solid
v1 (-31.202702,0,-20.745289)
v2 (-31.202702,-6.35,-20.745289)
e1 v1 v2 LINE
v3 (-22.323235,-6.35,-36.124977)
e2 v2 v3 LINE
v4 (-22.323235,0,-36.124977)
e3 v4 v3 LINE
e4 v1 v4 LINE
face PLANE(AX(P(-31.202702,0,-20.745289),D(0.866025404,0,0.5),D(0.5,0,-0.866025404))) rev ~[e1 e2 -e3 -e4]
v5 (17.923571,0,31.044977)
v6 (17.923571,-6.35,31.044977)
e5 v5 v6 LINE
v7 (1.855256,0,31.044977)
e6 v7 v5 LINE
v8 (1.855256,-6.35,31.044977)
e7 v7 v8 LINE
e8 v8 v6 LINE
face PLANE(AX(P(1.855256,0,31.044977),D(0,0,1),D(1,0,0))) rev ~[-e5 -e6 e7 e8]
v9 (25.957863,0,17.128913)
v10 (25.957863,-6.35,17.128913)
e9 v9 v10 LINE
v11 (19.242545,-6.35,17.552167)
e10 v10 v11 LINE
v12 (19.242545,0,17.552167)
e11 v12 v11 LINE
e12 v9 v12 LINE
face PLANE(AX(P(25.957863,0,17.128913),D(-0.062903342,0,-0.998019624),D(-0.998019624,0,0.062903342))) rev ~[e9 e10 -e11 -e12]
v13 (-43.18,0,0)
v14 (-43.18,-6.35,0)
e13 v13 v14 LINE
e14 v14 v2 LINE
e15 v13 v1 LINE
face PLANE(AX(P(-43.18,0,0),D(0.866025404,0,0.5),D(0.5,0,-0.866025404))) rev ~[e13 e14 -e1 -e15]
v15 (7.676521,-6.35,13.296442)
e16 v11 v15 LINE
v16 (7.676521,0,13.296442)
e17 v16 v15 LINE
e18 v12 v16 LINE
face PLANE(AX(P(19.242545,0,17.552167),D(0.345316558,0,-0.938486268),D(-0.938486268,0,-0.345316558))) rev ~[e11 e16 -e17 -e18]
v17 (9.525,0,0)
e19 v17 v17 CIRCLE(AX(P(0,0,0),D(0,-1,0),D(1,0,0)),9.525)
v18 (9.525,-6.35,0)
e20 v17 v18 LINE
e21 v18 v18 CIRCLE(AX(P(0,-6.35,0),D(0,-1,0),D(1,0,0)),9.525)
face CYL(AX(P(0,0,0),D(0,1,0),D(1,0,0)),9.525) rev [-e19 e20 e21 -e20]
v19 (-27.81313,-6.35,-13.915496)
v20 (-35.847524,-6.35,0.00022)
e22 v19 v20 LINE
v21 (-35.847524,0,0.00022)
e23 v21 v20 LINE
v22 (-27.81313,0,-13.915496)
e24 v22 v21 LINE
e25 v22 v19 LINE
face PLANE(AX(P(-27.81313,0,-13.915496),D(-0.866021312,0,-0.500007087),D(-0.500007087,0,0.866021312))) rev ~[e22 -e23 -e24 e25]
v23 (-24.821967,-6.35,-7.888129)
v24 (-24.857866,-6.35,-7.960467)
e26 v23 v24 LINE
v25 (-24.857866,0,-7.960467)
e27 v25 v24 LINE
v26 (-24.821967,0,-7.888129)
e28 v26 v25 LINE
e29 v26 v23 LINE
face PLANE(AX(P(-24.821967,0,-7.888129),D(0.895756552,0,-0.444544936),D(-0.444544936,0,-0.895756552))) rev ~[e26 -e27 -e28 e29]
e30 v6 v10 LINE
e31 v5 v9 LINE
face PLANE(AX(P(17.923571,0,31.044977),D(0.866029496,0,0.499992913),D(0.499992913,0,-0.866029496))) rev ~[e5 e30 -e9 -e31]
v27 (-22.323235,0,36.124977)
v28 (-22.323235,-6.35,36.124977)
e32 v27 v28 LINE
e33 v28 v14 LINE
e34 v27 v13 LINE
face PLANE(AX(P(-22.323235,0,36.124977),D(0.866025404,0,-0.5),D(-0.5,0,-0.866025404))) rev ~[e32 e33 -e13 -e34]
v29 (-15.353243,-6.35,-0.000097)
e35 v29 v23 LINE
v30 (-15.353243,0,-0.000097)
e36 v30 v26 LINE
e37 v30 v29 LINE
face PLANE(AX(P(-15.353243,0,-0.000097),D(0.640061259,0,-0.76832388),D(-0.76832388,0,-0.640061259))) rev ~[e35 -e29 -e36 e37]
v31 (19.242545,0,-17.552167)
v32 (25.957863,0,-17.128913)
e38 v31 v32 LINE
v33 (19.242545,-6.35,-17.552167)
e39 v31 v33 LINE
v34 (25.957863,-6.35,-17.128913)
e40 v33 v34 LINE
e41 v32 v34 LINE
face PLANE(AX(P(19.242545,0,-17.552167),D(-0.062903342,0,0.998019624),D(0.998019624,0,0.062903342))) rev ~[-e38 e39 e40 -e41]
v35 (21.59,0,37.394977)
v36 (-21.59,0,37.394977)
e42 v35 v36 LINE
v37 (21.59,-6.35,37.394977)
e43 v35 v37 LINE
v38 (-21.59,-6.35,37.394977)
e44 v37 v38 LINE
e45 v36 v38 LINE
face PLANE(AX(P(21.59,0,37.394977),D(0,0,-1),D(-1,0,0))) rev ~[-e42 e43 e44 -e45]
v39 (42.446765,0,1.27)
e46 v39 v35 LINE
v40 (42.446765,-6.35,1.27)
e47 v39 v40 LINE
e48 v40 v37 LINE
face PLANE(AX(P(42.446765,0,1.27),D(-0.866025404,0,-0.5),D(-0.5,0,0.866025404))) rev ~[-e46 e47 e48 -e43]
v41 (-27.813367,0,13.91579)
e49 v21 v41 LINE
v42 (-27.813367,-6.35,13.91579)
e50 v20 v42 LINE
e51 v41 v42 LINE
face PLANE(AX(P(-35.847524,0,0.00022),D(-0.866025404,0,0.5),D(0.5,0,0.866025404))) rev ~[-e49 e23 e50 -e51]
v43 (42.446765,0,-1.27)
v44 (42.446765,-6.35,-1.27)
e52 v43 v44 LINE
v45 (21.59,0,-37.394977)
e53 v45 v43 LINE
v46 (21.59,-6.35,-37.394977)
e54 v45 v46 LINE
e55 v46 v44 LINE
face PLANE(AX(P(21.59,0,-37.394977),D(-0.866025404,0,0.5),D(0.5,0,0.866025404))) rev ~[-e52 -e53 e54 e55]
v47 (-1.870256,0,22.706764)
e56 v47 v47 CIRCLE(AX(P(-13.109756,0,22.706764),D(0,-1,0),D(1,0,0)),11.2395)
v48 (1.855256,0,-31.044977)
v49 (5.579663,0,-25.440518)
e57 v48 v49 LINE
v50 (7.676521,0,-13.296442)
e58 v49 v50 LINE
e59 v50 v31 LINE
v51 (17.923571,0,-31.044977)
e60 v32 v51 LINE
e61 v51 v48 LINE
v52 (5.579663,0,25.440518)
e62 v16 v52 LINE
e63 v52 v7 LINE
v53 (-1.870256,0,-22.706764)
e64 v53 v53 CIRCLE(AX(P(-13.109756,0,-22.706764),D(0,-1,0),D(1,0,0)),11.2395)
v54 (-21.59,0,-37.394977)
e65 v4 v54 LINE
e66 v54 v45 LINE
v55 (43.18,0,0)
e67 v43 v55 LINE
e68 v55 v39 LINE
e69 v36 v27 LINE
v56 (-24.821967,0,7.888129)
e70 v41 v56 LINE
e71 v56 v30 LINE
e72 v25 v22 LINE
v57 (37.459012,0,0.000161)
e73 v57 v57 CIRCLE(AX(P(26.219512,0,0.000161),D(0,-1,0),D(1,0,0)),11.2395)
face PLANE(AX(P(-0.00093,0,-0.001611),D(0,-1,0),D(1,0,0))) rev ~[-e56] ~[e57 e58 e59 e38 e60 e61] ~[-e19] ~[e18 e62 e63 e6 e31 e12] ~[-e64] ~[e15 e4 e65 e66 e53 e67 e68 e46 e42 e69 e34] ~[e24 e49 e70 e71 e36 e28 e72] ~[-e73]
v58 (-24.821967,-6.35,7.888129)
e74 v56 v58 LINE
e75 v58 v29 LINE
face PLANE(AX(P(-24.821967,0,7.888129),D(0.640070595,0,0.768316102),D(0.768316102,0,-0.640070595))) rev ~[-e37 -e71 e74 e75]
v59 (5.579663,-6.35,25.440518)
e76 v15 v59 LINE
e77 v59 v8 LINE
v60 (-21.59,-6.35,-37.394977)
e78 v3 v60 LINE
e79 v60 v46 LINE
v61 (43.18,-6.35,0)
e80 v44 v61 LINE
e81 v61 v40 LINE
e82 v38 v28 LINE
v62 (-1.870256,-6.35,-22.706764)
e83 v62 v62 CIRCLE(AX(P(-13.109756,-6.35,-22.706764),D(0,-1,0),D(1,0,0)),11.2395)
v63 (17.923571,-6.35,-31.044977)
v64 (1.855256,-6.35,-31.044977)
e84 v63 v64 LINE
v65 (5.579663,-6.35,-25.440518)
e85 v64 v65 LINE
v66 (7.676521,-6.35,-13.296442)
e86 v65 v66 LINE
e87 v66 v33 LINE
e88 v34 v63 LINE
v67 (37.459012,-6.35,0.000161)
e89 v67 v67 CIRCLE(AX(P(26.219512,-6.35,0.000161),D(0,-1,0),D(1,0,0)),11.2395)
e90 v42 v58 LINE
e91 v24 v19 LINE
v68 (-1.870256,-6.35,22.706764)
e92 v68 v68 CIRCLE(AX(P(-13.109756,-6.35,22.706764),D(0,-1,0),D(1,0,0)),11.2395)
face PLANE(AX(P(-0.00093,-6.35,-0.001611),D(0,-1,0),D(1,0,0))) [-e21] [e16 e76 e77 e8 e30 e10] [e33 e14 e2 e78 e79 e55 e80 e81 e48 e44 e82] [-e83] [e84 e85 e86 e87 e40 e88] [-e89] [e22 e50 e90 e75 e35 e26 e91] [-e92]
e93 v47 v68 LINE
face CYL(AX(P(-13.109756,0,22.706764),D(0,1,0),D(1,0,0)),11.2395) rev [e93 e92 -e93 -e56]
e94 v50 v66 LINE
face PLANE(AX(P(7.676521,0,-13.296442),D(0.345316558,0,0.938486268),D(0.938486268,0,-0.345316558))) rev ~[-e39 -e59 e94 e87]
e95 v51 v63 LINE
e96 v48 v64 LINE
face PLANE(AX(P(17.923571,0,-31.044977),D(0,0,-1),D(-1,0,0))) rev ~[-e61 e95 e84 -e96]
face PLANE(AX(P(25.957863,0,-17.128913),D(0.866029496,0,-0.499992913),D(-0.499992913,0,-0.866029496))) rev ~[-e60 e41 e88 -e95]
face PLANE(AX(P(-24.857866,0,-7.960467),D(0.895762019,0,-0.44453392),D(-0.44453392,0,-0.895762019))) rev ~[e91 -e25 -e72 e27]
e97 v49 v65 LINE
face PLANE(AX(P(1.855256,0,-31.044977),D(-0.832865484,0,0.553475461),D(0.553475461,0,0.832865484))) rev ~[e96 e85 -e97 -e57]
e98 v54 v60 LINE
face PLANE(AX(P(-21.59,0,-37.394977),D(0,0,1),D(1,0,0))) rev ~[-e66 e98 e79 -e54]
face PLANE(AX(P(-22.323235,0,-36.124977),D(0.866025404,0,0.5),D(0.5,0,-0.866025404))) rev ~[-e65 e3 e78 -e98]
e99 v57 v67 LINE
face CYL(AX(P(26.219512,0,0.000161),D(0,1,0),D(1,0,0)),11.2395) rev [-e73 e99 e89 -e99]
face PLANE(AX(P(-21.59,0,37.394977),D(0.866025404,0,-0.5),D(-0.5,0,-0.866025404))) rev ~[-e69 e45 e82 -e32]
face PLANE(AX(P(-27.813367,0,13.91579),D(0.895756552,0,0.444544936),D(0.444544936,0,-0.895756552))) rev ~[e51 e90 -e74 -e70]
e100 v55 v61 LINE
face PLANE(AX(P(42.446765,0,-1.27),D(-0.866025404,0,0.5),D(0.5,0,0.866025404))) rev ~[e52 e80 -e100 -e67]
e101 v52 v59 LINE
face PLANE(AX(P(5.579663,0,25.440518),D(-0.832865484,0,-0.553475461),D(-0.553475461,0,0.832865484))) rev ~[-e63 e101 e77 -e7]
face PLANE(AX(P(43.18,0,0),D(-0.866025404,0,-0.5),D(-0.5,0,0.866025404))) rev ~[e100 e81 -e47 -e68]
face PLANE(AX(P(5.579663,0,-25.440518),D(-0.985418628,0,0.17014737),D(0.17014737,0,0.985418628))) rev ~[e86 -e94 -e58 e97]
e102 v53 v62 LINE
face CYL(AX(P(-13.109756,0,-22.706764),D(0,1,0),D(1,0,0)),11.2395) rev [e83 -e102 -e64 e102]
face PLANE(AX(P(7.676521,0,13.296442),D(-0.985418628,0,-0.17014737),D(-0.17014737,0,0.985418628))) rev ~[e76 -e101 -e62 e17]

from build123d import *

# Parameters (mm, degrees)
F0_R     = 11.2395
F0_R_2   = 9.525
F1_DEPTH = 6.35


# Not quite as in the source:
# - ends of sketch curves that miss each other by under 0.0002 mm in the source are joined


with BuildPart() as f1:
    # F0 (on Front) → F1 (new body)
    with BuildSketch(Plane.XZ):
        with BuildLine():
            Line((42.4467651581, 1.27), (33.5675281941, 16.6492895541))
            Line((33.5675281941, 16.6492895541), (21.59, 37.3949769354))
            Line((21.59, 37.3949769354), (-2.3645964913, 37.3949769354))
            Line((-2.3645964913, 37.3949769354), (-20.1235303163, 37.3949769354))
            ThreePointArc((-20.1235303163, 37.3949769354), (-21.3935303163, 37.054681461), (-22.3232348419, 36.1249769354))
            Line((-22.3232348419, 36.1249769354), (-31.2024718059, 20.7456873813))
            Line((-31.2024718059, 20.7456873813), (-43.18, 0))
            Line((-43.18, 0), (-31.2027017544, -20.7452890988))
            Line((-31.2027017544, -20.7452890988), (-22.3232348418, -36.1249769356))
            ThreePointArc((-22.3232348418, -36.1249769356), (-21.9195815404, -36.6510281597), (-21.3935303163, -37.0546814611))
            ThreePointArc((-21.3935303163, -37.0546814611), (-20.7809306909, -37.3084285342), (-20.1235303165, -37.3949769354))
            Line((-20.1235303165, -37.3949769354), (-2.3645964913, -37.3949769354))
            Line((-2.3645964913, -37.3949769354), (21.59, -37.3949769354))
            Line((21.59, -37.3949769354), (33.5675281941, -16.6492895541))
            Line((33.5675281941, -16.6492895541), (42.4467651581, -1.27))
            ThreePointArc((42.4467651581, -1.27), (42.7870606325, 0), (42.4467651581, 1.27))
        make_face()
        with Locations((-13.1097560234, -22.7067635073)):
            Circle(F0_R, mode=Mode.SUBTRACT)
        Polygon((1.8552556307, -31.0449769354), (5.579663063, -25.4405181745), (7.6765207659, -13.2964418818), (19.2425445444, -17.5521669359), (25.957862804, -17.1289127727), (17.9235712565, -31.0449769354), align=None, mode=Mode.SUBTRACT)
        Polygon((-15.3532430276, -9.74608e-05), (-24.8219665561, -7.8881291301), (-24.8578663434, -7.9604670809), (-27.8131295737, -13.9154964701), (-35.8475243142, 0.000220433), (-27.8133665013, 13.915789961), (-24.8219665561, 7.8881291301), align=None, mode=Mode.SUBTRACT)
        with Locations((-13.1097560234, 22.7067635073)):
            Circle(F0_R, mode=Mode.SUBTRACT)
        Circle(F0_R_2, mode=Mode.SUBTRACT)
        with Locations((26.2195120463, 0.0001612286)):
            Circle(F0_R, mode=Mode.SUBTRACT)
        Polygon((7.6765207659, 13.2964418818), (5.579663063, 25.4405181745), (1.8552556307, 31.0449769354), (17.9235712565, 31.0449769354), (25.957862804, 17.1289127727), (19.2425445444, 17.5521669359), align=None, mode=Mode.SUBTRACT)
        with BuildLine():
            Line((43.18, 0), (42.4467651581, 1.27))
            ThreePointArc((42.4467651581, 1.27), (42.7870606325, 0), (42.4467651581, -1.27))
            Line((42.4467651581, -1.27), (43.18, 0))
        make_face()
        with BuildLine():
            ThreePointArc((-22.3232348419, 36.1249769354), (-21.3935303163, 37.054681461), (-20.1235303163, 37.3949769354))
            Line((-20.1235303163, 37.3949769354), (-21.59, 37.3949769354))
            Line((-21.59, 37.3949769354), (-22.3232348419, 36.1249769354))
        make_face()
        with BuildLine():
            Line((-21.59, -37.3949769354), (-20.1235303165, -37.3949769354))
            ThreePointArc((-20.1235303165, -37.3949769354), (-20.7809306909, -37.3084285342), (-21.3935303163, -37.0546814611))
            Line((-21.3935303163, -37.0546814611), (-21.59, -37.3949769354))
        make_face()
        with BuildLine():
            Line((-21.59, -37.3949769354), (-21.3935303163, -37.0546814611))
            ThreePointArc((-21.3935303163, -37.0546814611), (-21.9195815404, -36.6510281597), (-22.3232348418, -36.1249769356))
            Line((-22.3232348418, -36.1249769356), (-21.59, -37.3949769354))
        make_face()
    extrude(amount=F1_DEPTH)


solid = f1.part
